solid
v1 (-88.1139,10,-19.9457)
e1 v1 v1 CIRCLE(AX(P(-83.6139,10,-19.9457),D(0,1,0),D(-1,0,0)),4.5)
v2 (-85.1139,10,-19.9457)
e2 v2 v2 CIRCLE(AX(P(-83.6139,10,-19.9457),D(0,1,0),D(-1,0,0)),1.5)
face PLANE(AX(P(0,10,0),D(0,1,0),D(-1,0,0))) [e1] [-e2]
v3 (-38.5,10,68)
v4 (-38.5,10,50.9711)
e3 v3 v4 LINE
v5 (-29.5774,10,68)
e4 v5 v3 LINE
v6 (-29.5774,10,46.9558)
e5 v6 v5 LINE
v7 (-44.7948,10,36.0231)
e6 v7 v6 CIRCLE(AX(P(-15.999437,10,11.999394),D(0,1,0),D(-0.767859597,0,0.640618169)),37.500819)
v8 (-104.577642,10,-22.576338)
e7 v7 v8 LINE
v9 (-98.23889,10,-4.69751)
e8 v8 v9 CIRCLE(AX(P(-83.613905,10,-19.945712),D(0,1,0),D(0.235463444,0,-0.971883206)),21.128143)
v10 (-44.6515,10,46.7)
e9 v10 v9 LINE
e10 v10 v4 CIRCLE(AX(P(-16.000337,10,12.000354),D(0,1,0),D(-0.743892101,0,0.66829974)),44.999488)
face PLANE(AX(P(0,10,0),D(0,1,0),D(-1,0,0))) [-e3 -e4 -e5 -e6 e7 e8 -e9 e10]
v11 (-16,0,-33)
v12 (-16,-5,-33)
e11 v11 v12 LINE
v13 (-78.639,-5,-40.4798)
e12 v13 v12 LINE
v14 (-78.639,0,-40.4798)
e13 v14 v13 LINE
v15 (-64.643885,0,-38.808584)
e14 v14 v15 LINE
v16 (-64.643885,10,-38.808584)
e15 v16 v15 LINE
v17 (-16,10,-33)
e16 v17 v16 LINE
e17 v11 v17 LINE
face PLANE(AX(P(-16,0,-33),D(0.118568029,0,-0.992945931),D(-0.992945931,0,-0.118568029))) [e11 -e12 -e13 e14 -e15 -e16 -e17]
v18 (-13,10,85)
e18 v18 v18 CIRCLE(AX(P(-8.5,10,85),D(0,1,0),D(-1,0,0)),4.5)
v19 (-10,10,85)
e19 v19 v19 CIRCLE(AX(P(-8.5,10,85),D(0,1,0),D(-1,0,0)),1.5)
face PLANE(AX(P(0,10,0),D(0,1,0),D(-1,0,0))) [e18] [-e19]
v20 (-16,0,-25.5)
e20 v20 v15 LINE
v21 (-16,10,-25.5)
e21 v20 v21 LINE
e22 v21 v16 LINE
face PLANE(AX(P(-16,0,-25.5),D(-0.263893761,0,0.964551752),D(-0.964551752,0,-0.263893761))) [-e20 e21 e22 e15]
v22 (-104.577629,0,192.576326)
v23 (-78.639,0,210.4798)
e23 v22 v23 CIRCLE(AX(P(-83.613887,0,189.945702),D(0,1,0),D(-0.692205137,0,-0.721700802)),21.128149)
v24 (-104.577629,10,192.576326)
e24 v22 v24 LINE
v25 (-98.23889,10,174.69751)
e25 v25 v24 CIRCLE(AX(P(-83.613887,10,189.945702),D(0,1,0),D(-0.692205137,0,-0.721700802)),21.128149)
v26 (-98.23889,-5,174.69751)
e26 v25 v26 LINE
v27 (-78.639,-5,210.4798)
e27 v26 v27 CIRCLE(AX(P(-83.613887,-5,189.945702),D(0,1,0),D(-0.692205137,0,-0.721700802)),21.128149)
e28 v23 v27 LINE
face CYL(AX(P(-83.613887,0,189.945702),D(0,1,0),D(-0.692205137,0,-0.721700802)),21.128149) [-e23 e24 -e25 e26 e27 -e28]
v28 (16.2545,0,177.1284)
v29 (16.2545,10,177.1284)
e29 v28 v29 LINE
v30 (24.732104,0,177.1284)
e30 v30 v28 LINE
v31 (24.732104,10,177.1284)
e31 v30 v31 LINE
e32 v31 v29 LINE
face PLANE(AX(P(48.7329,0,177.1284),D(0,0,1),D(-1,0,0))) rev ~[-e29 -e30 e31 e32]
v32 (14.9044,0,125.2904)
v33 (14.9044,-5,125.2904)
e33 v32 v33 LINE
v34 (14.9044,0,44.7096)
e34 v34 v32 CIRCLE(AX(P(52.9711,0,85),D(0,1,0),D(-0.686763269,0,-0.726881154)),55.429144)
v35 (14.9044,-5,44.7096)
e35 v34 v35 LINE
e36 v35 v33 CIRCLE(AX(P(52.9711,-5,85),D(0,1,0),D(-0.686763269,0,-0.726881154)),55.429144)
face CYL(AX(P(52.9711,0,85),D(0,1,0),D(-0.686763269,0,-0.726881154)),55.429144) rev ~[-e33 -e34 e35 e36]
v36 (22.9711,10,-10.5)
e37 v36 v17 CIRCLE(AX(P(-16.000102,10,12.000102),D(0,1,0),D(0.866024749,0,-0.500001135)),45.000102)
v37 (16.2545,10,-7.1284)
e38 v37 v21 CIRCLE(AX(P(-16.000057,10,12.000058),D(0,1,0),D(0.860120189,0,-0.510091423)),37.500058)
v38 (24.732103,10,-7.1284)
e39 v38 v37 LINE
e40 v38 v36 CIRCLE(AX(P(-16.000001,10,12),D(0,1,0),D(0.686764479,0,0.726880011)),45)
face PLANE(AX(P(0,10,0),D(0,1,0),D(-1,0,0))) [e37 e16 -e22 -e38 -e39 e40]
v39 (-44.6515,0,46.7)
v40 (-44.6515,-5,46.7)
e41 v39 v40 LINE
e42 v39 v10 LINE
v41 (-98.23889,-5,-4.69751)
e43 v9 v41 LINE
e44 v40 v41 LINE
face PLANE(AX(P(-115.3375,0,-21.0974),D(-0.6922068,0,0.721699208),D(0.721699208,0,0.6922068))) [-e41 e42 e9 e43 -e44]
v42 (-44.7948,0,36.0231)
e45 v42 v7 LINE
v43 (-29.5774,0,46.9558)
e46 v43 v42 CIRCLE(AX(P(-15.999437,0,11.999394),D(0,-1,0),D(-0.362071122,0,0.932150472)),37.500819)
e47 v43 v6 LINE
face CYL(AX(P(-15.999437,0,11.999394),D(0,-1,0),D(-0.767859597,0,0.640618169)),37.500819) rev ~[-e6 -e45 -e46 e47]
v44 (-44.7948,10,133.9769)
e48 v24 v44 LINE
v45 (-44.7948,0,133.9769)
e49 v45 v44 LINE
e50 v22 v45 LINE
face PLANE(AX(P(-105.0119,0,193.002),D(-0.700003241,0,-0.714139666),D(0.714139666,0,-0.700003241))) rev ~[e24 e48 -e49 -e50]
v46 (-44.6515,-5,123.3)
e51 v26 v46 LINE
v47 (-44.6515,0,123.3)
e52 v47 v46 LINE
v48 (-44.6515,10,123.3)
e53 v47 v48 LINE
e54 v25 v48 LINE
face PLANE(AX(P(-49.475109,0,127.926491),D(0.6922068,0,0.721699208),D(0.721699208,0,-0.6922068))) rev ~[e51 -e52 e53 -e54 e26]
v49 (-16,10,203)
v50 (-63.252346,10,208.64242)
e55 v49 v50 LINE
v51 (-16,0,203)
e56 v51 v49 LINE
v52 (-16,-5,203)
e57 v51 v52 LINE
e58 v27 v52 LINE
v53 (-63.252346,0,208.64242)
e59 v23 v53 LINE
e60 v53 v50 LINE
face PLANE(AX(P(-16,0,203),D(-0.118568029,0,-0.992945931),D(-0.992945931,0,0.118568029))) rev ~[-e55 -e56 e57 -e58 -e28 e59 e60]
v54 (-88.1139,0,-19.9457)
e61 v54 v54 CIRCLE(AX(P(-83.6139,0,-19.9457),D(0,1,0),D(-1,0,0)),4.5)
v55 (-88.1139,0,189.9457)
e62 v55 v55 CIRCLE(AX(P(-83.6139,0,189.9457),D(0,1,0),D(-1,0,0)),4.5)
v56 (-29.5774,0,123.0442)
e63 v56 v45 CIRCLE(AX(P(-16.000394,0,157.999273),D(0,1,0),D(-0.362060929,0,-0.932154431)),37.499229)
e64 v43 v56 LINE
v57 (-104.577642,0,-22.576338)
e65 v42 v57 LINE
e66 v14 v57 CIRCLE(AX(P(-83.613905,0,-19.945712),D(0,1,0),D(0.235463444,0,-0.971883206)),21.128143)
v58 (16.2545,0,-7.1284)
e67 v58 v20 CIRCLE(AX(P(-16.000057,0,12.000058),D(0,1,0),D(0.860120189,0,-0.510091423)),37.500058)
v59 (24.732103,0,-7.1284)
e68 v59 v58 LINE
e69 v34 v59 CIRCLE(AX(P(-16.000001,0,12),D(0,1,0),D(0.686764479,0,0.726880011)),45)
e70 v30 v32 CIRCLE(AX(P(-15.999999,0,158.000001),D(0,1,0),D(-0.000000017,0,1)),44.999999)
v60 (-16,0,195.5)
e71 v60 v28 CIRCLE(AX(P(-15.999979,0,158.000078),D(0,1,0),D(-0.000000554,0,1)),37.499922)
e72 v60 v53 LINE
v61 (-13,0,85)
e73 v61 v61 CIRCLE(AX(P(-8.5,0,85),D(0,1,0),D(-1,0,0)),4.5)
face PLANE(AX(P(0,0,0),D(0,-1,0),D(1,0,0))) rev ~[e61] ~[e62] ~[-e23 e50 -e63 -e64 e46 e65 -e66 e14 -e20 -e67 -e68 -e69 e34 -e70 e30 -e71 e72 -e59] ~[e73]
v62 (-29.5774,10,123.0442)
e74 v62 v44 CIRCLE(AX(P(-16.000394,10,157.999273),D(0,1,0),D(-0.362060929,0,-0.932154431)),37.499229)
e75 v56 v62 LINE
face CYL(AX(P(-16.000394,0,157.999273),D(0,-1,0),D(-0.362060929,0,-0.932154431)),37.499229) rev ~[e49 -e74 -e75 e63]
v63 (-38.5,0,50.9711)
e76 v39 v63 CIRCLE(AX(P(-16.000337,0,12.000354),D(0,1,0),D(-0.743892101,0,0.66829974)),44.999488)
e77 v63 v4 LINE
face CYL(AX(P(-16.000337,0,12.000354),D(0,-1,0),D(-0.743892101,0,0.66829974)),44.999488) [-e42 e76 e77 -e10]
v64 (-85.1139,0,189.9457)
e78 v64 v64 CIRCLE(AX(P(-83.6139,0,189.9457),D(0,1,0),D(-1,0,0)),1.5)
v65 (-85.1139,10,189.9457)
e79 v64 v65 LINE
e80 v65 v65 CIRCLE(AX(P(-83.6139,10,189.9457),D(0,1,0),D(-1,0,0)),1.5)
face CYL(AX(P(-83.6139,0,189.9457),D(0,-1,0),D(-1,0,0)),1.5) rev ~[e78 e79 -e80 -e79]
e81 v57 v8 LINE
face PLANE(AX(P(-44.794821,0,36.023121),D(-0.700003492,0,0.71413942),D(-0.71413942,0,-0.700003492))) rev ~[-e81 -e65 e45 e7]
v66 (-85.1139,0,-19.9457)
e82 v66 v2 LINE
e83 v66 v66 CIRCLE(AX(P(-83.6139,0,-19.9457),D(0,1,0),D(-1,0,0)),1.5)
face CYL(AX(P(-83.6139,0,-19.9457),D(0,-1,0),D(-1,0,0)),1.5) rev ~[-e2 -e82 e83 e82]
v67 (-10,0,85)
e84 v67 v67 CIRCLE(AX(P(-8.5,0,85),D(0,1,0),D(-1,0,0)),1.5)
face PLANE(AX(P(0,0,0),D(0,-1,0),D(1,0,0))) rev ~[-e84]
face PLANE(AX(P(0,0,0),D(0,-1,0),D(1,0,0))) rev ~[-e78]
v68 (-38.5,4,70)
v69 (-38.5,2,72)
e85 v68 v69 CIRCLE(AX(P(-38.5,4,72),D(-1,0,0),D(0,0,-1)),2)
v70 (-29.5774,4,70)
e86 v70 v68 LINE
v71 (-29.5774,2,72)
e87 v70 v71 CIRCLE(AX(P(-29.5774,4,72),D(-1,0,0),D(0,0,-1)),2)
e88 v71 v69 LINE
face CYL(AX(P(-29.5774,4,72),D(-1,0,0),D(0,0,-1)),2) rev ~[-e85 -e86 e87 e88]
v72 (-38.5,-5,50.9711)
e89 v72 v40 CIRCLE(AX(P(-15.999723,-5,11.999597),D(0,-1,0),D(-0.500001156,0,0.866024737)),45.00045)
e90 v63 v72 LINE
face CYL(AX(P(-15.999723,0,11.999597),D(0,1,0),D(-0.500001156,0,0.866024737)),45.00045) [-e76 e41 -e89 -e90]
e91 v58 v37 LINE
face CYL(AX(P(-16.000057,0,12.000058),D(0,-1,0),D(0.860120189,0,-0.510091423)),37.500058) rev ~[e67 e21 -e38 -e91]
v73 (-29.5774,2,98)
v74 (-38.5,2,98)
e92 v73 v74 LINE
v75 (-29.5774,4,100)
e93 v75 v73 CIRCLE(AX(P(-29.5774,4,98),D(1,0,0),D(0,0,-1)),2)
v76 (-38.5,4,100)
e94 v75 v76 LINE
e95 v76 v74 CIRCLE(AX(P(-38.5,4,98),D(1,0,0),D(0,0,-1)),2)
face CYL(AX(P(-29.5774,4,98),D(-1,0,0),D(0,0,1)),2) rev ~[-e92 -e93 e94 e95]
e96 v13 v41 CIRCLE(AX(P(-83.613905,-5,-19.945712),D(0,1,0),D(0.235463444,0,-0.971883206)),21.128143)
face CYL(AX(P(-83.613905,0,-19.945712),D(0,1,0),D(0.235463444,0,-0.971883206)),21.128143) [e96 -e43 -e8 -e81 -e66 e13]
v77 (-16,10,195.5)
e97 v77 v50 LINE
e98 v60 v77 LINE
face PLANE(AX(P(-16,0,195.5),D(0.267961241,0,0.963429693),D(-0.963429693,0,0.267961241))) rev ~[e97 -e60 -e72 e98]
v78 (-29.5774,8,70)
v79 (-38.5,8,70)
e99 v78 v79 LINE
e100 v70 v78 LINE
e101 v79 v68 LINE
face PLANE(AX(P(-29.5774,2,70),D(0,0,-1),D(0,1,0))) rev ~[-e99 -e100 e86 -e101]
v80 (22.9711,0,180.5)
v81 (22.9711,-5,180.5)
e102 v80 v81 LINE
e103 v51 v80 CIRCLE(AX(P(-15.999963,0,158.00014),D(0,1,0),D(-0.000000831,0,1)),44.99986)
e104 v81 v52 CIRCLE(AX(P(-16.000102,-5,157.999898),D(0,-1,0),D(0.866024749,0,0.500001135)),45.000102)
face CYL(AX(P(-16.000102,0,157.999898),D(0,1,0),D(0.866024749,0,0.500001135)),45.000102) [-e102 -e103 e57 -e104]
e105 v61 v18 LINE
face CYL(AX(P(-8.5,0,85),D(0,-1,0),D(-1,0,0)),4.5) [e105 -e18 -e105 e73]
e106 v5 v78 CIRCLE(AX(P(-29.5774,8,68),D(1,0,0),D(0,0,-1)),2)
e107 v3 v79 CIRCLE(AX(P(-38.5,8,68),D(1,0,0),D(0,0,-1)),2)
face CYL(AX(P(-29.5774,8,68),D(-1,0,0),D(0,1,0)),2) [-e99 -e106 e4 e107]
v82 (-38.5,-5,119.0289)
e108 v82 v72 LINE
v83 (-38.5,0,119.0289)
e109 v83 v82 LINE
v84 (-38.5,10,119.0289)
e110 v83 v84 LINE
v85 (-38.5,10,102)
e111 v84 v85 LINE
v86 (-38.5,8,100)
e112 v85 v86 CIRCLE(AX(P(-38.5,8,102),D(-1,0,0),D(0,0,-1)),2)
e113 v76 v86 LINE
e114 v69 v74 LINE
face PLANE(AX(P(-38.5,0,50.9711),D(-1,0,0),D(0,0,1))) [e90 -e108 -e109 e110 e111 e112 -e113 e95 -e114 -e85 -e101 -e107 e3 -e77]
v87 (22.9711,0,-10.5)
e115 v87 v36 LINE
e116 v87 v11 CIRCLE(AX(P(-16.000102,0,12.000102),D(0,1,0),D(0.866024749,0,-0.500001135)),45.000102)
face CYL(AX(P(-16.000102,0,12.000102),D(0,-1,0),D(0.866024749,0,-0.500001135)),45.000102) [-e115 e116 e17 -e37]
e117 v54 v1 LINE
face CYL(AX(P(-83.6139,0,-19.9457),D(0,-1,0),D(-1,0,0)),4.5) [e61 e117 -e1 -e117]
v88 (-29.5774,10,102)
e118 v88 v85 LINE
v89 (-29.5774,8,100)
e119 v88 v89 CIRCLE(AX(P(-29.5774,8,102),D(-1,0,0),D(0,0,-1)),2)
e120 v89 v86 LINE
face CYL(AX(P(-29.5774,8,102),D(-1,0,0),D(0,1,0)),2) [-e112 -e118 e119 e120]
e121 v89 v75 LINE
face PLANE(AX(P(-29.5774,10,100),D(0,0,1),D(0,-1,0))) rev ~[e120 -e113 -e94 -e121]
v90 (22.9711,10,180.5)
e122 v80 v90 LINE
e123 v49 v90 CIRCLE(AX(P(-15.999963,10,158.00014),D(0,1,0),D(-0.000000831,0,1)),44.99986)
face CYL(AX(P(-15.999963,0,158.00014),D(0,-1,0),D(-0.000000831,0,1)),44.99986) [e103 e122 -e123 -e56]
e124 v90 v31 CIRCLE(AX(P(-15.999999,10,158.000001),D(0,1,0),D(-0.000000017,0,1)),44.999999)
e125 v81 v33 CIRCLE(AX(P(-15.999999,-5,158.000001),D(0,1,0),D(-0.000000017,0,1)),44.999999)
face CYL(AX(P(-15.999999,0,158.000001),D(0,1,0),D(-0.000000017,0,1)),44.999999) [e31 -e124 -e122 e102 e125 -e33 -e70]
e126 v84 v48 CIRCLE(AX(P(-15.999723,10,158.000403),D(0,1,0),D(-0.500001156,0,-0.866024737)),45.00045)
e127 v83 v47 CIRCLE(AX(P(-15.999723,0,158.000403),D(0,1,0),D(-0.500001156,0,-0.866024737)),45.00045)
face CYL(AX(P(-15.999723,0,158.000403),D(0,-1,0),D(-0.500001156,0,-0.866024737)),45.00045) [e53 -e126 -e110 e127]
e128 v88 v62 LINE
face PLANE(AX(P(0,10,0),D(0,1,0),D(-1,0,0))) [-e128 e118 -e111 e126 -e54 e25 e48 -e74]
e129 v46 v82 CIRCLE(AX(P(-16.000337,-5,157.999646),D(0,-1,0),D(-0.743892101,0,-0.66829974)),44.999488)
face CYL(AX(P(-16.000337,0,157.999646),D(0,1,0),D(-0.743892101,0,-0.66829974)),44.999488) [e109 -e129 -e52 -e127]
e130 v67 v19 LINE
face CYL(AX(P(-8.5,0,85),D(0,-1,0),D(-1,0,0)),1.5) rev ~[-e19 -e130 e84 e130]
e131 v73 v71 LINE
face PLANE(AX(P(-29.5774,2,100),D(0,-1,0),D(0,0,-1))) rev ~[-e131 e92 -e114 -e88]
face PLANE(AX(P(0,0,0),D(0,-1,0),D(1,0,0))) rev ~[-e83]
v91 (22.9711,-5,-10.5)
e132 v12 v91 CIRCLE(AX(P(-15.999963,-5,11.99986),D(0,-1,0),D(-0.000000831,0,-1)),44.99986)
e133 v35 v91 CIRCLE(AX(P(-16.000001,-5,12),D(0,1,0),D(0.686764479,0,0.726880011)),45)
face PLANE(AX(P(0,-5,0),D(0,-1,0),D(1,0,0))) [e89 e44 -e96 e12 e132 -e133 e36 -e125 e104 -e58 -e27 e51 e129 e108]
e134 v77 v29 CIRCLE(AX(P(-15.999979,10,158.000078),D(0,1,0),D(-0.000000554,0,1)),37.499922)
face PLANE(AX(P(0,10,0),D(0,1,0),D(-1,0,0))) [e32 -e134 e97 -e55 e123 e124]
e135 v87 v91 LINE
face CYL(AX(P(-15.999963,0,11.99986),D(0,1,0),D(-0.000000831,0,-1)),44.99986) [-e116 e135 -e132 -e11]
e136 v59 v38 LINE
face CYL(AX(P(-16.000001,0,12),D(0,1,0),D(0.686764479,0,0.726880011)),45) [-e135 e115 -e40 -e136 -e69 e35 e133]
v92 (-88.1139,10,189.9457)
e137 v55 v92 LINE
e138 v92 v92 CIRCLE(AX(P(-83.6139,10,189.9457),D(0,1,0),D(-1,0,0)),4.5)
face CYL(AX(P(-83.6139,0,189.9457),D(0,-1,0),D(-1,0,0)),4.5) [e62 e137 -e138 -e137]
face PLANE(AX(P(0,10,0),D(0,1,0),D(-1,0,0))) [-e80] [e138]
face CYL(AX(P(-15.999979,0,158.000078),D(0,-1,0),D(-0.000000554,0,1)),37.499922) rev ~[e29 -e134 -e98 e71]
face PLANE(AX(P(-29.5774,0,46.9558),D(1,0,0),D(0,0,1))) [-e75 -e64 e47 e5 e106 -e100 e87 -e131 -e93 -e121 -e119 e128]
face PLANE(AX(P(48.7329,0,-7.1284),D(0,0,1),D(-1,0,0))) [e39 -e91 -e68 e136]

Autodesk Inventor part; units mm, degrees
ref_plane "YZ Plane" through (0, 0, 0) normal (1, 0, 0) x (0, 1, 0)
ref_plane "XZ Plane" through (0, 0, 0) normal (0, 1, 0) x (-1, 0, 0)
ref_plane "XY Plane" through (0, 0, 0) normal (0, 0, 1) x (1, 0, 0)
sketch "Boceto1" plane through (0, 0, 0) normal (0, 1, 0) x (-1, 0, 0)
  line L0 (16, -33) -> (103.2837, -54.9444)
  line L1 (38.5, 50.9711) -> (38.5, 119.0289)
  line L2 (-22.9711, -10.5) -> (-52.9711, -10.5)
  arc A0 (-22.9711, -10.5) -> (16, -33) centre (16, 12) ccw
  arc A1 (-51.515, 38.5517) -> (-6.5, 85) centre (-52.9711, 85) ccw
  arc A2 (-22.9711, -10.5) -> (16, -33) centre (16, 12) ccw
  arc A3 (-51.515, 38.5517) -> (-52.9711, -10.5) centre (16, 12) ccw
  line L3 (38.5, 50.9711) -> (38.5, 85)
  arc A4 (103.2837, -54.9444) -> (115.3375, -21.0974) centre (95.2119, -33) ccw
  line L4 (115.3375, -21.0974) -> (44.6515, 46.7)
  line L5 (16, 203) -> (103.2837, 224.9444)
  arc A5 (16, 203) -> (-22.9711, 180.5) centre (16, 158) ccw
  line L6 (115.3375, 191.0974) -> (44.6515, 123.3)
  arc A6 (115.3375, 191.0974) -> (103.2837, 224.9444) centre (95.2119, 203) ccw
  arc A7 (16, 203) -> (-22.9711, 180.5) centre (16, 158) ccw
  line L7 (38.5, 119.0289) -> (38.5, 50.9711)
  line L8 (-22.9711, 180.5) -> (-52.9711, 180.5)
  line L9 (38.5, 119.0289) -> (38.5, 85)
  arc A8 (-52.9711, 180.5) -> (-51.515, 131.4483) centre (16, 158) ccw
  arc A9 (-6.5, 85) -> (-51.515, 131.4483) centre (-52.9711, 85) ccw
  arc A10 (-22.9711, -10.5) -> (16, -33) centre (16, 12) ccw
  arc A11 (49.4751, 42.0735) -> (38.5, 50.9711) centre (16, 12) ccw
  arc A12 (38.5, 119.0289) -> (49.4751, 127.9265) centre (16, 158) ccw
  arc A13 (16, 203) -> (-22.9711, 180.5) centre (16, 158) ccw
  circle A14 centre (83.6139, -19.9457) radius 1.5
  circle A15 centre (8.5, 85) radius 1.5
  circle A16 centre (83.6139, 189.9457) radius 1.5
  arc A17 (88.6874, -45.3867) -> (105.0119, -23.002) centre (95.2119, -33) ccw
  arc A18 (105.0119, 193.002) -> (91.4604, 216.488) centre (95.2119, 203) ccw
  arc A19 (-48.2434, 32.7133) -> (-48.2434, 137.2867) centre (-52.9711, 85) ccw
  arc A20 (-48.7329, 177.1284) -> (-48.2434, 137.2867) centre (16, 158) ccw
  arc A21 (-48.2434, 32.7133) -> (-48.7329, -7.1284) centre (16, 12) ccw
  line L10 (-48.7329, -7.1284) -> (-16.2545, -7.1284)
  line L11 (-48.7329, 177.1284) -> (-16.2545, 177.1284)
  line L12 (16, 195.5) -> (91.4604, 216.488)
  line L13 (16, -25.5) -> (88.6874, -45.3867)
  line L14 (39.4427, 41.2693) -> (105.0119, -23.002)
  line L15 (105.0119, 193.002) -> (44.7948, 133.9769)
  line L16 (29.5774, 46.9558) -> (29.5774, 123.0442)
  arc A22 (44.7948, 36.0231) -> (29.5774, 46.9558) centre (16, 12) ccw
  arc A23 (-16.2545, -7.1284) -> (16, -25.5) centre (16, 12) ccw
  arc A24 (29.5774, 123.0442) -> (44.7948, 133.9769) centre (16, 158) ccw
  arc A25 (16, 195.5) -> (-16.2545, 177.1284) centre (16, 158) ccw
  circle A26 centre (83.6139, -19.9457) radius 4.5
  circle A27 centre (8.5, 85) radius 4.5
  circle A28 centre (83.6139, 189.9457) radius 4.5
  point P0 (0, 0)
  dimension "d8" = 9
  dimension "d9" = 9
  dimension "d10" = 9
extrude "Extrusión1" add sketch "Boceto1" along normal blind 10 contours A0 L2 A3 A1 A9 A8 L8 A5 L5 A6 L6 A12 L1 A11 L4 A4 L0 | A26 | A27 | A28
sketch "Boceto2" plane through (0, 0, 0) normal (0, -1, 0) x (1, 0, 0)
  line L0 (-16, 203) -> (-103.2837, 224.9444)
  line L1 (22.9711, 180.5) -> (52.9711, 180.5)
  arc A0 (22.9711, 180.5) -> (-16, 203) centre (-16, 158) ccw
  arc A1 (22.9711, 180.5) -> (-16, 203) centre (-16, 158) ccw
  arc A2 (51.515, 131.4483) -> (52.9711, 180.5) centre (-16, 158) ccw
  line L2 (-38.5, 119.0289) -> (-38.5, 85)
  arc A3 (-103.2837, 224.9444) -> (-115.3375, 191.0974) centre (-95.2119, 203) ccw
  line L3 (-115.3375, 191.0974) -> (-44.6515, 123.3)
  line L4 (-16, -33) -> (-103.2837, -54.9444)
  arc A4 (-16, -33) -> (22.9711, -10.5) centre (-16, 12) ccw
  line L5 (-115.3375, -21.0974) -> (-44.6515, 46.7)
  arc A5 (-115.3375, -21.0974) -> (-103.2837, -54.9444) centre (-95.2119, -33) ccw
  arc A6 (-16, -33) -> (22.9711, -10.5) centre (-16, 12) ccw
  line L6 (22.9711, -10.5) -> (52.9711, -10.5)
  line L7 (-38.5, 50.9711) -> (-38.5, 85)
  arc A7 (52.9711, -10.5) -> (51.515, 38.5517) centre (-16, 12) ccw
  arc A8 (51.515, 131.4483) -> (52.9711, 180.5) centre (-16, 158) ccw projected
  arc A9 (-38.5, 50.9711) -> (-49.4751, 42.0735) centre (-16, 12) ccw
  arc A10 (-16, -33) -> (22.9711, -10.5) centre (-16, 12) ccw
  arc A11 (22.9711, 180.5) -> (-16, 203) centre (-16, 158) ccw
  arc A12 (-49.4751, 127.9265) -> (-38.5, 119.0289) centre (-16, 158) ccw
  arc A13 (51.515, 131.4483) -> (51.515, 38.5517) centre (52.9711, 85) ccw projected
  arc A14 (51.515, 131.4483) -> (51.515, 38.5517) centre (52.9711, 85) ccw
  point P0 (0, 170)
extrude "Extrusión2" add sketch "Boceto2" along normal blind 5 contours A0 L1 A2 A13 A7 L6 A4 L4 A5 L5 A9 L7 L2 A12 L3 A3 L0
sketch "Boceto3" plane through (-29.5774, 10, 123.0442) normal (1, 0, 0) x (0, 0, -1)
  line L0 (0, 0) -> (76.0885, 0) projected
  line L1 (38.0442, 0) -> (53.0442, 0)
  line L2 (72.0731, 0) -> (4.0154, 0) projected
  line L3 (38.0442, 0) -> (23.0442, 0)
  line L4 (23.0442, 0) -> (23.0442, -8)
  line L5 (23.0442, -8) -> (53.0442, -8)
  line L6 (53.0442, -8) -> (53.0442, 0)
  point P0 (123.0442, -10)
  point P1 (53.0442, 0)
  point P2 (23.0442, 0)
  dimension "d15" = 15
  dimension "d16" = 15
  dimension "d17" = 8
extrude "Extrusión3" cut sketch "Boceto3" against normal blind 15
fillet "Empalme1" radius 2 4 edges at (-34.0387, 2, 100) (-34.0387, 2, 70) (-34.0387, 10, 70) (-34.0387, 10, 100)
sketch "Boceto4" plane through (0, 10, 0) normal (0, 1, 0) x (1, 0, 0)
  line L0 (59.5944, 0) -> (46.2124, 0)
  line L1 (46.2124, 0) -> (46.2124, -23.3919)
  line L2 (46.2124, -23.3919) -> (63.6147, -23.3919)
  line L3 (63.6147, -23.3919) -> (63.6147, 0)
  circle A0 centre (-8.5, -85) radius 1.5 projected
  line L4 (-8.5, -85) -> (35.636, -85)
  line L5 (59.5944, -170) -> (46.2124, -170)
  line L6 (46.2124, -170) -> (46.2124, -146.6081)
  line L7 (46.2124, -146.6081) -> (63.6147, -146.6081)
  line L8 (63.6147, -146.6081) -> (63.6147, -170)
  line L9 (59.5944, -170) -> (63.6147, -170)
  line L10 (63.6147, 0) -> (58.9449, 0)
  point P0 (0, 0)
extrude "Extrusión4" cut sketch "Boceto4" against normal blind 8 contours L10 L3 L2 L1 L0 | L5 L6 L7 L8 L9
fillet "Empalme2" radius 2 8 edges at (53.0901, 2, 146.6081) (52.9869, 2, 170) (52.9869, 10, 170) (53.0901, 10, 146.6081) (53.0901, 2, 23.3919) (52.9869, 2, 0) (52.9869, 10, 0) (53.0901, 10, 23.3919)
sketch "Boceto5" plane through (0, 0, 0) normal (0, 1, 0) x (1, 0, 0)
  arc A0 (22.9711, 10.5) -> (-16, 33) centre (-16, -12) ccw
  arc A1 (14.9044, -44.7096) -> (-16, 33) centre (-16, -12) ccw
  arc A2 (6.5, -158) -> (-33.6139, -144) centre (-16, -158) ccw
  arc A3 (14.9044, -44.7096) -> (14.9044, -125.2904) centre (52.9711, -85) ccw
  arc A4 (-78.639, 40.4798) -> (-98.2389, 4.6975) centre (-83.6139, 19.9457) ccw
  arc A5 (-98.2389, -174.6975) -> (-78.639, -210.4798) centre (-83.6139, -189.9457) ccw
  arc A6 (-16, -203) -> (22.9711, -180.5) centre (-16, -158) ccw
  line L0 (-16, -203) -> (-83.6139, -211.0738)
  line L1 (-16, 33) -> (-83.6139, 41.0738)
  arc A7 (-16, -203) -> (14.9044, -125.2904) centre (-16, -158) ccw
  line L2 (-98.2389, 4.6975) -> (-38.5, -52.6001)
  line L3 (-38.5, -119.0289) -> (-38.5, -50.9711)
  line L4 (-98.2389, -174.6975) -> (-38.5, -117.3999)
  line L5 (-38.5, -117.3999) -> (-38.5, -52.6001)
  circle A8 centre (-16, -85) radius 202.8163
  point P0 (0, 0)
  point P1 (-44.6515, -46.7)
  point P2 (-44.6515, -123.3)
extrude "Extrusión5" cut sketch "Boceto5" against normal mid plane 30
properties part number "mando_inf"
